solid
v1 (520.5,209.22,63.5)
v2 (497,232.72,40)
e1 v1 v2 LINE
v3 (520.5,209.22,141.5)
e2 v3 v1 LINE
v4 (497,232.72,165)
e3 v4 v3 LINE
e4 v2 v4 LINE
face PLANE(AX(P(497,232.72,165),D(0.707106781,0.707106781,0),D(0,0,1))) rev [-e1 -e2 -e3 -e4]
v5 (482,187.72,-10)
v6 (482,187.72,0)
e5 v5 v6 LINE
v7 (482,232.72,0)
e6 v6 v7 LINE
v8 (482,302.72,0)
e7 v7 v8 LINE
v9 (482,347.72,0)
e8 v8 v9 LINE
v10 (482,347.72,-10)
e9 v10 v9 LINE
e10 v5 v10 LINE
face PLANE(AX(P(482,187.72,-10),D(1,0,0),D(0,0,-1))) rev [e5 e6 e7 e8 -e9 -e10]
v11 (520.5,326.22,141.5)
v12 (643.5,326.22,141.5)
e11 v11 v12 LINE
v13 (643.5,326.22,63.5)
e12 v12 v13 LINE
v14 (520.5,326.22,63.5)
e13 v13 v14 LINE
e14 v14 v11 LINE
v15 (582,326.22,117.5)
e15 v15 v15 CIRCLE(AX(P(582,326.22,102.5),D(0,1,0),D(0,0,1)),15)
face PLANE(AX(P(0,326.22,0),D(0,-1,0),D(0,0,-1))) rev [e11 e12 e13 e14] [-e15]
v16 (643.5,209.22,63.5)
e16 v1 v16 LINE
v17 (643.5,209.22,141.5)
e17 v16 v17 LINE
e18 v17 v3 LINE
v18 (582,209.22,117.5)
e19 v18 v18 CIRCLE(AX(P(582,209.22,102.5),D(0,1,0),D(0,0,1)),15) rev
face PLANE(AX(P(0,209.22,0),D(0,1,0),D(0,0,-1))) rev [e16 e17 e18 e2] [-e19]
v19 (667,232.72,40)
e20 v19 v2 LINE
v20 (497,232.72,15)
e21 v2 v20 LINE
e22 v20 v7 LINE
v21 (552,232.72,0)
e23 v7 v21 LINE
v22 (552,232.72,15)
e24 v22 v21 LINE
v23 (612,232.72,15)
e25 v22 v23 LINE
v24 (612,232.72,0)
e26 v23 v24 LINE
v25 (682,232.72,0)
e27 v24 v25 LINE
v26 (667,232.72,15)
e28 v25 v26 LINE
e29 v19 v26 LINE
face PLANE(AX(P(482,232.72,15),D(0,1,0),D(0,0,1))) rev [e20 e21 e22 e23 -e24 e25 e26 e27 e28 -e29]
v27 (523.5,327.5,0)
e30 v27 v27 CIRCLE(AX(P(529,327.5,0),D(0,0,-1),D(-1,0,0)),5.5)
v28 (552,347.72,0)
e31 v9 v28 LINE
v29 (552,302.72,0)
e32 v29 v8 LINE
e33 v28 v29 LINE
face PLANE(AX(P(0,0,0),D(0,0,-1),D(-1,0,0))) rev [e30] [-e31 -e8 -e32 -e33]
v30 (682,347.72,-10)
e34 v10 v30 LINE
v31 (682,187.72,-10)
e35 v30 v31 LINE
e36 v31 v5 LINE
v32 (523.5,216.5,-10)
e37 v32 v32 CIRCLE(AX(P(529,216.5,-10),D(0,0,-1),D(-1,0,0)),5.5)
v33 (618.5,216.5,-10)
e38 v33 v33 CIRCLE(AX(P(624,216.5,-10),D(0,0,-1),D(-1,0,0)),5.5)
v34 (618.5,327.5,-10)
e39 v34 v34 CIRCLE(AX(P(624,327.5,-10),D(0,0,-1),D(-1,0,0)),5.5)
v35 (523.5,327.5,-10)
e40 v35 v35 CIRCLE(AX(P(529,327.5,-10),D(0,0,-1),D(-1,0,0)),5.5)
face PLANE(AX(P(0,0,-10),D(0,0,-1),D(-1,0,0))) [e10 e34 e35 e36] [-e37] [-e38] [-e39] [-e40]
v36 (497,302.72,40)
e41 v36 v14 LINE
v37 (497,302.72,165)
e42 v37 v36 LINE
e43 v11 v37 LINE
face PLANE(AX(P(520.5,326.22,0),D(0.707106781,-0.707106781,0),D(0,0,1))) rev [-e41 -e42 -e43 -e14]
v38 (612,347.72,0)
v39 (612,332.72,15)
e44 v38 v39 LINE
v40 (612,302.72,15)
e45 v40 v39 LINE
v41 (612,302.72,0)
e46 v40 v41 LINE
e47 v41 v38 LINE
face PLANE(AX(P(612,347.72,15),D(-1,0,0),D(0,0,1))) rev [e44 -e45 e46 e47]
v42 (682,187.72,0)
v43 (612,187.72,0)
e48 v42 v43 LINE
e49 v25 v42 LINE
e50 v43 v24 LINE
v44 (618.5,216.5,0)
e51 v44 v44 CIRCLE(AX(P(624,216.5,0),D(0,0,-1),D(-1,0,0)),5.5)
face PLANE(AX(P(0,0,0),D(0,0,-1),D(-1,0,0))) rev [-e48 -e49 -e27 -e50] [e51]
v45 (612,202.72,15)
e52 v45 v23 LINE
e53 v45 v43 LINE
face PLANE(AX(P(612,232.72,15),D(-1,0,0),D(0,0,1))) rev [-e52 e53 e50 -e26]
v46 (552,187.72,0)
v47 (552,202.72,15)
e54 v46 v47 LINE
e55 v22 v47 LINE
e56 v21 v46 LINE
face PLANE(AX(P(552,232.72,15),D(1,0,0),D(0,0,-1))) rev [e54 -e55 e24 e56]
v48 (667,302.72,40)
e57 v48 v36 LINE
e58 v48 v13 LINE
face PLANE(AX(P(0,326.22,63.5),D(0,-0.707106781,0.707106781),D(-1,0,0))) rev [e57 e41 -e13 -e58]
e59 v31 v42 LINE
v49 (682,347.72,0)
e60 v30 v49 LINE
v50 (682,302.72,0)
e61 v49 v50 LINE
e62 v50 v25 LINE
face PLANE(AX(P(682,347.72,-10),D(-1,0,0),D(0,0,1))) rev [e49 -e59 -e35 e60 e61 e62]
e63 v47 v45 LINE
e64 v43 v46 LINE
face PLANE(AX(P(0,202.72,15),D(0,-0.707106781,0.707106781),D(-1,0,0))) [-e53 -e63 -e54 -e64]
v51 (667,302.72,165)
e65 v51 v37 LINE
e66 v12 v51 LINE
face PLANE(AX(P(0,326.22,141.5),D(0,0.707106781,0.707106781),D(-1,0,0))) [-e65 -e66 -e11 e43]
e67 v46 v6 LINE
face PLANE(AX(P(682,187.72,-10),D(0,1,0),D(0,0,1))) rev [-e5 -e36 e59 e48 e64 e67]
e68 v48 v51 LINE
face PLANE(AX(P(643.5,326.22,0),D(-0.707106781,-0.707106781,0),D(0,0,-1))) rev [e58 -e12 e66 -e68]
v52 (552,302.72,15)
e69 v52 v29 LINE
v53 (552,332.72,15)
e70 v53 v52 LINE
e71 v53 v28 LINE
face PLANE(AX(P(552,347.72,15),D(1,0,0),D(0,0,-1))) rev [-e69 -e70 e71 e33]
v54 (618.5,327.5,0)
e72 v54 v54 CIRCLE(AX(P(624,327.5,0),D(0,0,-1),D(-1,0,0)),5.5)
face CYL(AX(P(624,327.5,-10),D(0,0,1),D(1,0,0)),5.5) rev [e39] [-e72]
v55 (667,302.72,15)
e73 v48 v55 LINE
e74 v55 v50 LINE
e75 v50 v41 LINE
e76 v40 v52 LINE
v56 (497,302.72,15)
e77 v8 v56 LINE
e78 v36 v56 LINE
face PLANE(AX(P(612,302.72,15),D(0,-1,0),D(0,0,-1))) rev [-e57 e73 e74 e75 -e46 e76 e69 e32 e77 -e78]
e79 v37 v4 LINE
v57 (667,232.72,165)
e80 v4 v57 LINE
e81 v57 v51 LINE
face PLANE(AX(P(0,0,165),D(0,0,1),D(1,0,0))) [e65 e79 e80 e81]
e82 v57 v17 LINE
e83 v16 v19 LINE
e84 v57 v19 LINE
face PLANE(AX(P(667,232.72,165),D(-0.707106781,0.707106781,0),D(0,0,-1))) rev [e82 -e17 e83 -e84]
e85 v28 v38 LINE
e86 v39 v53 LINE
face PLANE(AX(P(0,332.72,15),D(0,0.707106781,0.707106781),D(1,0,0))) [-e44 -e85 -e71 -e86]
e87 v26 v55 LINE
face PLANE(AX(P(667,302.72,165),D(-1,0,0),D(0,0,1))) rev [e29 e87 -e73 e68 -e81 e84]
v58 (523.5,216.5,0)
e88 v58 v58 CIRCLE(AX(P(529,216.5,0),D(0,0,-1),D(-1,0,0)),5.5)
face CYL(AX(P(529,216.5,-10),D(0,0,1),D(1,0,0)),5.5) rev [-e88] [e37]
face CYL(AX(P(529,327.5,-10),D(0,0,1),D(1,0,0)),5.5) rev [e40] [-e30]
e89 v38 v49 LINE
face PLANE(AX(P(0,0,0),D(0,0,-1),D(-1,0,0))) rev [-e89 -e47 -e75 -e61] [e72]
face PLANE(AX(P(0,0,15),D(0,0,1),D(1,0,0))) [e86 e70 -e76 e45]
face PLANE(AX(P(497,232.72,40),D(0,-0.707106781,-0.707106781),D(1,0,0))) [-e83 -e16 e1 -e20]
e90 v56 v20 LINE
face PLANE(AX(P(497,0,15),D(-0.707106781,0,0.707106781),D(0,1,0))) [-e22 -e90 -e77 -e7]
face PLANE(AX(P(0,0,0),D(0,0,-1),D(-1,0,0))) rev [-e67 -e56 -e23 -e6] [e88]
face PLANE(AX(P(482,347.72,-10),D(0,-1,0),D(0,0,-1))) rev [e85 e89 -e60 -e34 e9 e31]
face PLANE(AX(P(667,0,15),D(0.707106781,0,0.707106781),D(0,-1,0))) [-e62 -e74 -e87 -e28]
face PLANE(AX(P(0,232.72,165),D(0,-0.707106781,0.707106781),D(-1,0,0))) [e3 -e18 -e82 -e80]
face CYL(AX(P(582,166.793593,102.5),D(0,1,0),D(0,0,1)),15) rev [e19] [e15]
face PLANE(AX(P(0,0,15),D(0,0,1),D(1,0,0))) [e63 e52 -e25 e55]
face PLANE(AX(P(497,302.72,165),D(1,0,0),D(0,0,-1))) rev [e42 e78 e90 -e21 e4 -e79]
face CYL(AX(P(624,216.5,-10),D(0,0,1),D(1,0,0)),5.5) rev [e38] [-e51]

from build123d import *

# Parameters (mm, degrees)
SCHIZZO21_W                  = 200
SCHIZZO21_H                  = 160
SCHIZZO21_R                  = 5.5
ESTRUSIONE_ESTRUSIONE1_DEPTH = 10
ESTRUSIONE_ESTRUSIONE2_DEPTH = 15
SMUSSO1_SIZE                 = 15
SCHIZZO23_W                  = 170
SCHIZZO23_H                  = 70
ESTRUSIONE_ESTRUSIONE3_DEPTH = 150
SCHIZZO24_W                  = 170
SCHIZZO24_H                  = 125
ESTRUSIONE_ESTRUSIONE4_DEPTH = 23.5
SMUSSO5_SIZE                 = 23.5
SMUSSO5_OF_SPECCHIA1_SIZE    = 23.5
SCHIZZO26_R                  = 15
TAGLIO_ESTRUSIONE1_DEPTH     = 117


with BuildPart() as part:
    # Schizzo21 → Estrusione-Estrusione1 (new body)
    with BuildSketch(Plane(origin=(0, 0, 0), x_dir=(-1, 0, 0), z_dir=(0, 0, -1))):
        with Locations((-582, 267.72)):
            Rectangle(SCHIZZO21_W, SCHIZZO21_H)
        with Locations((-529, 327.5)):
            Circle(SCHIZZO21_R, mode=Mode.SUBTRACT)
        with Locations((-529, 216.5)):
            Circle(SCHIZZO21_R, mode=Mode.SUBTRACT)
        with Locations((-624, 216.5)):
            Circle(SCHIZZO21_R, mode=Mode.SUBTRACT)
        with Locations((-624, 327.5)):
            Circle(SCHIZZO21_R, mode=Mode.SUBTRACT)
    extrude(amount=ESTRUSIONE_ESTRUSIONE1_DEPTH)

    # Schizzo22 → Estrusione-Estrusione2 (add)
    with BuildSketch(Plane.XY):
        Polygon((482, 302.72), (552, 302.72), (552, 347.72), (612, 347.72), (612, 302.72), (682, 302.72), (682, 232.72), (612, 232.72), (612, 187.72), (552, 187.72), (552, 232.72), (482, 232.72), align=None)
    extrude(amount=ESTRUSIONE_ESTRUSIONE2_DEPTH)

    # Smusso1
    smusso1_edges = [part.edges().sort_by_distance(p)[0] for p in [
        (682, 267.72, 15),
        (582, 347.72, 15),
        (582, 187.72, 15),
        (482, 267.72, 15),
    ]]
    chamfer(smusso1_edges, length=SMUSSO1_SIZE)

    # Schizzo23 → Estrusione-Estrusione3 (add)
    with BuildSketch(Plane.XY.offset(15)):
        with Locations((582, 267.72)):
            Rectangle(SCHIZZO23_W, SCHIZZO23_H)
    extrude(amount=ESTRUSIONE_ESTRUSIONE3_DEPTH)

    # Schizzo24 → Estrusione-Estrusione4 (add)
    with BuildSketch(Plane(origin=(0, 302.72, 0), x_dir=(1, 0, 0), z_dir=(0, 1, 0))):
        with Locations((582, -102.5)):
            Rectangle(SCHIZZO24_W, SCHIZZO24_H)
    estrusione_estrusione4 = extrude(amount=ESTRUSIONE_ESTRUSIONE4_DEPTH)

    # Smusso5
    smusso5_edges = [part.edges().sort_by_distance(p)[0] for p in [
        (667, 326.22, 102.5),
        (582, 326.22, 40),
        (582, 326.22, 165),
        (497, 326.22, 102.5),
    ]]
    chamfer(smusso5_edges, length=SMUSSO5_SIZE - 0.0001)  # a hair under: the kernel refuses the full size

    # Specchia1: Estrusione-Estrusione4 across plane
    add(estrusione_estrusione4.mirror(Plane(origin=(0, 267.72, 0), x_dir=(0, 0, 1), z_dir=(0, -1, 0))))

    # Smusso5 of Specchia1
    smusso5_of_specchia1_edges = [part.edges().sort_by_distance(p)[0] for p in [
        (667, 209.22, 102.5),
        (582, 209.22, 40),
        (582, 209.22, 165),
        (497, 209.22, 102.5),
    ]]
    chamfer(smusso5_of_specchia1_edges, length=SMUSSO5_OF_SPECCHIA1_SIZE - 0.0001)  # a hair under: the kernel refuses the full size

    # Schizzo26 → Taglio-Estrusione1 (cut)
    with BuildSketch(Plane(origin=(0, 326.22, 0), x_dir=(1, 0, 0), z_dir=(0, 1, 0))):
        with Locations(Location((582, -102.5, 0), (0, 0, 270))):
            Circle(SCHIZZO26_R)
    extrude(amount=-TAGLIO_ESTRUSIONE1_DEPTH, mode=Mode.SUBTRACT)


solid = part.part
